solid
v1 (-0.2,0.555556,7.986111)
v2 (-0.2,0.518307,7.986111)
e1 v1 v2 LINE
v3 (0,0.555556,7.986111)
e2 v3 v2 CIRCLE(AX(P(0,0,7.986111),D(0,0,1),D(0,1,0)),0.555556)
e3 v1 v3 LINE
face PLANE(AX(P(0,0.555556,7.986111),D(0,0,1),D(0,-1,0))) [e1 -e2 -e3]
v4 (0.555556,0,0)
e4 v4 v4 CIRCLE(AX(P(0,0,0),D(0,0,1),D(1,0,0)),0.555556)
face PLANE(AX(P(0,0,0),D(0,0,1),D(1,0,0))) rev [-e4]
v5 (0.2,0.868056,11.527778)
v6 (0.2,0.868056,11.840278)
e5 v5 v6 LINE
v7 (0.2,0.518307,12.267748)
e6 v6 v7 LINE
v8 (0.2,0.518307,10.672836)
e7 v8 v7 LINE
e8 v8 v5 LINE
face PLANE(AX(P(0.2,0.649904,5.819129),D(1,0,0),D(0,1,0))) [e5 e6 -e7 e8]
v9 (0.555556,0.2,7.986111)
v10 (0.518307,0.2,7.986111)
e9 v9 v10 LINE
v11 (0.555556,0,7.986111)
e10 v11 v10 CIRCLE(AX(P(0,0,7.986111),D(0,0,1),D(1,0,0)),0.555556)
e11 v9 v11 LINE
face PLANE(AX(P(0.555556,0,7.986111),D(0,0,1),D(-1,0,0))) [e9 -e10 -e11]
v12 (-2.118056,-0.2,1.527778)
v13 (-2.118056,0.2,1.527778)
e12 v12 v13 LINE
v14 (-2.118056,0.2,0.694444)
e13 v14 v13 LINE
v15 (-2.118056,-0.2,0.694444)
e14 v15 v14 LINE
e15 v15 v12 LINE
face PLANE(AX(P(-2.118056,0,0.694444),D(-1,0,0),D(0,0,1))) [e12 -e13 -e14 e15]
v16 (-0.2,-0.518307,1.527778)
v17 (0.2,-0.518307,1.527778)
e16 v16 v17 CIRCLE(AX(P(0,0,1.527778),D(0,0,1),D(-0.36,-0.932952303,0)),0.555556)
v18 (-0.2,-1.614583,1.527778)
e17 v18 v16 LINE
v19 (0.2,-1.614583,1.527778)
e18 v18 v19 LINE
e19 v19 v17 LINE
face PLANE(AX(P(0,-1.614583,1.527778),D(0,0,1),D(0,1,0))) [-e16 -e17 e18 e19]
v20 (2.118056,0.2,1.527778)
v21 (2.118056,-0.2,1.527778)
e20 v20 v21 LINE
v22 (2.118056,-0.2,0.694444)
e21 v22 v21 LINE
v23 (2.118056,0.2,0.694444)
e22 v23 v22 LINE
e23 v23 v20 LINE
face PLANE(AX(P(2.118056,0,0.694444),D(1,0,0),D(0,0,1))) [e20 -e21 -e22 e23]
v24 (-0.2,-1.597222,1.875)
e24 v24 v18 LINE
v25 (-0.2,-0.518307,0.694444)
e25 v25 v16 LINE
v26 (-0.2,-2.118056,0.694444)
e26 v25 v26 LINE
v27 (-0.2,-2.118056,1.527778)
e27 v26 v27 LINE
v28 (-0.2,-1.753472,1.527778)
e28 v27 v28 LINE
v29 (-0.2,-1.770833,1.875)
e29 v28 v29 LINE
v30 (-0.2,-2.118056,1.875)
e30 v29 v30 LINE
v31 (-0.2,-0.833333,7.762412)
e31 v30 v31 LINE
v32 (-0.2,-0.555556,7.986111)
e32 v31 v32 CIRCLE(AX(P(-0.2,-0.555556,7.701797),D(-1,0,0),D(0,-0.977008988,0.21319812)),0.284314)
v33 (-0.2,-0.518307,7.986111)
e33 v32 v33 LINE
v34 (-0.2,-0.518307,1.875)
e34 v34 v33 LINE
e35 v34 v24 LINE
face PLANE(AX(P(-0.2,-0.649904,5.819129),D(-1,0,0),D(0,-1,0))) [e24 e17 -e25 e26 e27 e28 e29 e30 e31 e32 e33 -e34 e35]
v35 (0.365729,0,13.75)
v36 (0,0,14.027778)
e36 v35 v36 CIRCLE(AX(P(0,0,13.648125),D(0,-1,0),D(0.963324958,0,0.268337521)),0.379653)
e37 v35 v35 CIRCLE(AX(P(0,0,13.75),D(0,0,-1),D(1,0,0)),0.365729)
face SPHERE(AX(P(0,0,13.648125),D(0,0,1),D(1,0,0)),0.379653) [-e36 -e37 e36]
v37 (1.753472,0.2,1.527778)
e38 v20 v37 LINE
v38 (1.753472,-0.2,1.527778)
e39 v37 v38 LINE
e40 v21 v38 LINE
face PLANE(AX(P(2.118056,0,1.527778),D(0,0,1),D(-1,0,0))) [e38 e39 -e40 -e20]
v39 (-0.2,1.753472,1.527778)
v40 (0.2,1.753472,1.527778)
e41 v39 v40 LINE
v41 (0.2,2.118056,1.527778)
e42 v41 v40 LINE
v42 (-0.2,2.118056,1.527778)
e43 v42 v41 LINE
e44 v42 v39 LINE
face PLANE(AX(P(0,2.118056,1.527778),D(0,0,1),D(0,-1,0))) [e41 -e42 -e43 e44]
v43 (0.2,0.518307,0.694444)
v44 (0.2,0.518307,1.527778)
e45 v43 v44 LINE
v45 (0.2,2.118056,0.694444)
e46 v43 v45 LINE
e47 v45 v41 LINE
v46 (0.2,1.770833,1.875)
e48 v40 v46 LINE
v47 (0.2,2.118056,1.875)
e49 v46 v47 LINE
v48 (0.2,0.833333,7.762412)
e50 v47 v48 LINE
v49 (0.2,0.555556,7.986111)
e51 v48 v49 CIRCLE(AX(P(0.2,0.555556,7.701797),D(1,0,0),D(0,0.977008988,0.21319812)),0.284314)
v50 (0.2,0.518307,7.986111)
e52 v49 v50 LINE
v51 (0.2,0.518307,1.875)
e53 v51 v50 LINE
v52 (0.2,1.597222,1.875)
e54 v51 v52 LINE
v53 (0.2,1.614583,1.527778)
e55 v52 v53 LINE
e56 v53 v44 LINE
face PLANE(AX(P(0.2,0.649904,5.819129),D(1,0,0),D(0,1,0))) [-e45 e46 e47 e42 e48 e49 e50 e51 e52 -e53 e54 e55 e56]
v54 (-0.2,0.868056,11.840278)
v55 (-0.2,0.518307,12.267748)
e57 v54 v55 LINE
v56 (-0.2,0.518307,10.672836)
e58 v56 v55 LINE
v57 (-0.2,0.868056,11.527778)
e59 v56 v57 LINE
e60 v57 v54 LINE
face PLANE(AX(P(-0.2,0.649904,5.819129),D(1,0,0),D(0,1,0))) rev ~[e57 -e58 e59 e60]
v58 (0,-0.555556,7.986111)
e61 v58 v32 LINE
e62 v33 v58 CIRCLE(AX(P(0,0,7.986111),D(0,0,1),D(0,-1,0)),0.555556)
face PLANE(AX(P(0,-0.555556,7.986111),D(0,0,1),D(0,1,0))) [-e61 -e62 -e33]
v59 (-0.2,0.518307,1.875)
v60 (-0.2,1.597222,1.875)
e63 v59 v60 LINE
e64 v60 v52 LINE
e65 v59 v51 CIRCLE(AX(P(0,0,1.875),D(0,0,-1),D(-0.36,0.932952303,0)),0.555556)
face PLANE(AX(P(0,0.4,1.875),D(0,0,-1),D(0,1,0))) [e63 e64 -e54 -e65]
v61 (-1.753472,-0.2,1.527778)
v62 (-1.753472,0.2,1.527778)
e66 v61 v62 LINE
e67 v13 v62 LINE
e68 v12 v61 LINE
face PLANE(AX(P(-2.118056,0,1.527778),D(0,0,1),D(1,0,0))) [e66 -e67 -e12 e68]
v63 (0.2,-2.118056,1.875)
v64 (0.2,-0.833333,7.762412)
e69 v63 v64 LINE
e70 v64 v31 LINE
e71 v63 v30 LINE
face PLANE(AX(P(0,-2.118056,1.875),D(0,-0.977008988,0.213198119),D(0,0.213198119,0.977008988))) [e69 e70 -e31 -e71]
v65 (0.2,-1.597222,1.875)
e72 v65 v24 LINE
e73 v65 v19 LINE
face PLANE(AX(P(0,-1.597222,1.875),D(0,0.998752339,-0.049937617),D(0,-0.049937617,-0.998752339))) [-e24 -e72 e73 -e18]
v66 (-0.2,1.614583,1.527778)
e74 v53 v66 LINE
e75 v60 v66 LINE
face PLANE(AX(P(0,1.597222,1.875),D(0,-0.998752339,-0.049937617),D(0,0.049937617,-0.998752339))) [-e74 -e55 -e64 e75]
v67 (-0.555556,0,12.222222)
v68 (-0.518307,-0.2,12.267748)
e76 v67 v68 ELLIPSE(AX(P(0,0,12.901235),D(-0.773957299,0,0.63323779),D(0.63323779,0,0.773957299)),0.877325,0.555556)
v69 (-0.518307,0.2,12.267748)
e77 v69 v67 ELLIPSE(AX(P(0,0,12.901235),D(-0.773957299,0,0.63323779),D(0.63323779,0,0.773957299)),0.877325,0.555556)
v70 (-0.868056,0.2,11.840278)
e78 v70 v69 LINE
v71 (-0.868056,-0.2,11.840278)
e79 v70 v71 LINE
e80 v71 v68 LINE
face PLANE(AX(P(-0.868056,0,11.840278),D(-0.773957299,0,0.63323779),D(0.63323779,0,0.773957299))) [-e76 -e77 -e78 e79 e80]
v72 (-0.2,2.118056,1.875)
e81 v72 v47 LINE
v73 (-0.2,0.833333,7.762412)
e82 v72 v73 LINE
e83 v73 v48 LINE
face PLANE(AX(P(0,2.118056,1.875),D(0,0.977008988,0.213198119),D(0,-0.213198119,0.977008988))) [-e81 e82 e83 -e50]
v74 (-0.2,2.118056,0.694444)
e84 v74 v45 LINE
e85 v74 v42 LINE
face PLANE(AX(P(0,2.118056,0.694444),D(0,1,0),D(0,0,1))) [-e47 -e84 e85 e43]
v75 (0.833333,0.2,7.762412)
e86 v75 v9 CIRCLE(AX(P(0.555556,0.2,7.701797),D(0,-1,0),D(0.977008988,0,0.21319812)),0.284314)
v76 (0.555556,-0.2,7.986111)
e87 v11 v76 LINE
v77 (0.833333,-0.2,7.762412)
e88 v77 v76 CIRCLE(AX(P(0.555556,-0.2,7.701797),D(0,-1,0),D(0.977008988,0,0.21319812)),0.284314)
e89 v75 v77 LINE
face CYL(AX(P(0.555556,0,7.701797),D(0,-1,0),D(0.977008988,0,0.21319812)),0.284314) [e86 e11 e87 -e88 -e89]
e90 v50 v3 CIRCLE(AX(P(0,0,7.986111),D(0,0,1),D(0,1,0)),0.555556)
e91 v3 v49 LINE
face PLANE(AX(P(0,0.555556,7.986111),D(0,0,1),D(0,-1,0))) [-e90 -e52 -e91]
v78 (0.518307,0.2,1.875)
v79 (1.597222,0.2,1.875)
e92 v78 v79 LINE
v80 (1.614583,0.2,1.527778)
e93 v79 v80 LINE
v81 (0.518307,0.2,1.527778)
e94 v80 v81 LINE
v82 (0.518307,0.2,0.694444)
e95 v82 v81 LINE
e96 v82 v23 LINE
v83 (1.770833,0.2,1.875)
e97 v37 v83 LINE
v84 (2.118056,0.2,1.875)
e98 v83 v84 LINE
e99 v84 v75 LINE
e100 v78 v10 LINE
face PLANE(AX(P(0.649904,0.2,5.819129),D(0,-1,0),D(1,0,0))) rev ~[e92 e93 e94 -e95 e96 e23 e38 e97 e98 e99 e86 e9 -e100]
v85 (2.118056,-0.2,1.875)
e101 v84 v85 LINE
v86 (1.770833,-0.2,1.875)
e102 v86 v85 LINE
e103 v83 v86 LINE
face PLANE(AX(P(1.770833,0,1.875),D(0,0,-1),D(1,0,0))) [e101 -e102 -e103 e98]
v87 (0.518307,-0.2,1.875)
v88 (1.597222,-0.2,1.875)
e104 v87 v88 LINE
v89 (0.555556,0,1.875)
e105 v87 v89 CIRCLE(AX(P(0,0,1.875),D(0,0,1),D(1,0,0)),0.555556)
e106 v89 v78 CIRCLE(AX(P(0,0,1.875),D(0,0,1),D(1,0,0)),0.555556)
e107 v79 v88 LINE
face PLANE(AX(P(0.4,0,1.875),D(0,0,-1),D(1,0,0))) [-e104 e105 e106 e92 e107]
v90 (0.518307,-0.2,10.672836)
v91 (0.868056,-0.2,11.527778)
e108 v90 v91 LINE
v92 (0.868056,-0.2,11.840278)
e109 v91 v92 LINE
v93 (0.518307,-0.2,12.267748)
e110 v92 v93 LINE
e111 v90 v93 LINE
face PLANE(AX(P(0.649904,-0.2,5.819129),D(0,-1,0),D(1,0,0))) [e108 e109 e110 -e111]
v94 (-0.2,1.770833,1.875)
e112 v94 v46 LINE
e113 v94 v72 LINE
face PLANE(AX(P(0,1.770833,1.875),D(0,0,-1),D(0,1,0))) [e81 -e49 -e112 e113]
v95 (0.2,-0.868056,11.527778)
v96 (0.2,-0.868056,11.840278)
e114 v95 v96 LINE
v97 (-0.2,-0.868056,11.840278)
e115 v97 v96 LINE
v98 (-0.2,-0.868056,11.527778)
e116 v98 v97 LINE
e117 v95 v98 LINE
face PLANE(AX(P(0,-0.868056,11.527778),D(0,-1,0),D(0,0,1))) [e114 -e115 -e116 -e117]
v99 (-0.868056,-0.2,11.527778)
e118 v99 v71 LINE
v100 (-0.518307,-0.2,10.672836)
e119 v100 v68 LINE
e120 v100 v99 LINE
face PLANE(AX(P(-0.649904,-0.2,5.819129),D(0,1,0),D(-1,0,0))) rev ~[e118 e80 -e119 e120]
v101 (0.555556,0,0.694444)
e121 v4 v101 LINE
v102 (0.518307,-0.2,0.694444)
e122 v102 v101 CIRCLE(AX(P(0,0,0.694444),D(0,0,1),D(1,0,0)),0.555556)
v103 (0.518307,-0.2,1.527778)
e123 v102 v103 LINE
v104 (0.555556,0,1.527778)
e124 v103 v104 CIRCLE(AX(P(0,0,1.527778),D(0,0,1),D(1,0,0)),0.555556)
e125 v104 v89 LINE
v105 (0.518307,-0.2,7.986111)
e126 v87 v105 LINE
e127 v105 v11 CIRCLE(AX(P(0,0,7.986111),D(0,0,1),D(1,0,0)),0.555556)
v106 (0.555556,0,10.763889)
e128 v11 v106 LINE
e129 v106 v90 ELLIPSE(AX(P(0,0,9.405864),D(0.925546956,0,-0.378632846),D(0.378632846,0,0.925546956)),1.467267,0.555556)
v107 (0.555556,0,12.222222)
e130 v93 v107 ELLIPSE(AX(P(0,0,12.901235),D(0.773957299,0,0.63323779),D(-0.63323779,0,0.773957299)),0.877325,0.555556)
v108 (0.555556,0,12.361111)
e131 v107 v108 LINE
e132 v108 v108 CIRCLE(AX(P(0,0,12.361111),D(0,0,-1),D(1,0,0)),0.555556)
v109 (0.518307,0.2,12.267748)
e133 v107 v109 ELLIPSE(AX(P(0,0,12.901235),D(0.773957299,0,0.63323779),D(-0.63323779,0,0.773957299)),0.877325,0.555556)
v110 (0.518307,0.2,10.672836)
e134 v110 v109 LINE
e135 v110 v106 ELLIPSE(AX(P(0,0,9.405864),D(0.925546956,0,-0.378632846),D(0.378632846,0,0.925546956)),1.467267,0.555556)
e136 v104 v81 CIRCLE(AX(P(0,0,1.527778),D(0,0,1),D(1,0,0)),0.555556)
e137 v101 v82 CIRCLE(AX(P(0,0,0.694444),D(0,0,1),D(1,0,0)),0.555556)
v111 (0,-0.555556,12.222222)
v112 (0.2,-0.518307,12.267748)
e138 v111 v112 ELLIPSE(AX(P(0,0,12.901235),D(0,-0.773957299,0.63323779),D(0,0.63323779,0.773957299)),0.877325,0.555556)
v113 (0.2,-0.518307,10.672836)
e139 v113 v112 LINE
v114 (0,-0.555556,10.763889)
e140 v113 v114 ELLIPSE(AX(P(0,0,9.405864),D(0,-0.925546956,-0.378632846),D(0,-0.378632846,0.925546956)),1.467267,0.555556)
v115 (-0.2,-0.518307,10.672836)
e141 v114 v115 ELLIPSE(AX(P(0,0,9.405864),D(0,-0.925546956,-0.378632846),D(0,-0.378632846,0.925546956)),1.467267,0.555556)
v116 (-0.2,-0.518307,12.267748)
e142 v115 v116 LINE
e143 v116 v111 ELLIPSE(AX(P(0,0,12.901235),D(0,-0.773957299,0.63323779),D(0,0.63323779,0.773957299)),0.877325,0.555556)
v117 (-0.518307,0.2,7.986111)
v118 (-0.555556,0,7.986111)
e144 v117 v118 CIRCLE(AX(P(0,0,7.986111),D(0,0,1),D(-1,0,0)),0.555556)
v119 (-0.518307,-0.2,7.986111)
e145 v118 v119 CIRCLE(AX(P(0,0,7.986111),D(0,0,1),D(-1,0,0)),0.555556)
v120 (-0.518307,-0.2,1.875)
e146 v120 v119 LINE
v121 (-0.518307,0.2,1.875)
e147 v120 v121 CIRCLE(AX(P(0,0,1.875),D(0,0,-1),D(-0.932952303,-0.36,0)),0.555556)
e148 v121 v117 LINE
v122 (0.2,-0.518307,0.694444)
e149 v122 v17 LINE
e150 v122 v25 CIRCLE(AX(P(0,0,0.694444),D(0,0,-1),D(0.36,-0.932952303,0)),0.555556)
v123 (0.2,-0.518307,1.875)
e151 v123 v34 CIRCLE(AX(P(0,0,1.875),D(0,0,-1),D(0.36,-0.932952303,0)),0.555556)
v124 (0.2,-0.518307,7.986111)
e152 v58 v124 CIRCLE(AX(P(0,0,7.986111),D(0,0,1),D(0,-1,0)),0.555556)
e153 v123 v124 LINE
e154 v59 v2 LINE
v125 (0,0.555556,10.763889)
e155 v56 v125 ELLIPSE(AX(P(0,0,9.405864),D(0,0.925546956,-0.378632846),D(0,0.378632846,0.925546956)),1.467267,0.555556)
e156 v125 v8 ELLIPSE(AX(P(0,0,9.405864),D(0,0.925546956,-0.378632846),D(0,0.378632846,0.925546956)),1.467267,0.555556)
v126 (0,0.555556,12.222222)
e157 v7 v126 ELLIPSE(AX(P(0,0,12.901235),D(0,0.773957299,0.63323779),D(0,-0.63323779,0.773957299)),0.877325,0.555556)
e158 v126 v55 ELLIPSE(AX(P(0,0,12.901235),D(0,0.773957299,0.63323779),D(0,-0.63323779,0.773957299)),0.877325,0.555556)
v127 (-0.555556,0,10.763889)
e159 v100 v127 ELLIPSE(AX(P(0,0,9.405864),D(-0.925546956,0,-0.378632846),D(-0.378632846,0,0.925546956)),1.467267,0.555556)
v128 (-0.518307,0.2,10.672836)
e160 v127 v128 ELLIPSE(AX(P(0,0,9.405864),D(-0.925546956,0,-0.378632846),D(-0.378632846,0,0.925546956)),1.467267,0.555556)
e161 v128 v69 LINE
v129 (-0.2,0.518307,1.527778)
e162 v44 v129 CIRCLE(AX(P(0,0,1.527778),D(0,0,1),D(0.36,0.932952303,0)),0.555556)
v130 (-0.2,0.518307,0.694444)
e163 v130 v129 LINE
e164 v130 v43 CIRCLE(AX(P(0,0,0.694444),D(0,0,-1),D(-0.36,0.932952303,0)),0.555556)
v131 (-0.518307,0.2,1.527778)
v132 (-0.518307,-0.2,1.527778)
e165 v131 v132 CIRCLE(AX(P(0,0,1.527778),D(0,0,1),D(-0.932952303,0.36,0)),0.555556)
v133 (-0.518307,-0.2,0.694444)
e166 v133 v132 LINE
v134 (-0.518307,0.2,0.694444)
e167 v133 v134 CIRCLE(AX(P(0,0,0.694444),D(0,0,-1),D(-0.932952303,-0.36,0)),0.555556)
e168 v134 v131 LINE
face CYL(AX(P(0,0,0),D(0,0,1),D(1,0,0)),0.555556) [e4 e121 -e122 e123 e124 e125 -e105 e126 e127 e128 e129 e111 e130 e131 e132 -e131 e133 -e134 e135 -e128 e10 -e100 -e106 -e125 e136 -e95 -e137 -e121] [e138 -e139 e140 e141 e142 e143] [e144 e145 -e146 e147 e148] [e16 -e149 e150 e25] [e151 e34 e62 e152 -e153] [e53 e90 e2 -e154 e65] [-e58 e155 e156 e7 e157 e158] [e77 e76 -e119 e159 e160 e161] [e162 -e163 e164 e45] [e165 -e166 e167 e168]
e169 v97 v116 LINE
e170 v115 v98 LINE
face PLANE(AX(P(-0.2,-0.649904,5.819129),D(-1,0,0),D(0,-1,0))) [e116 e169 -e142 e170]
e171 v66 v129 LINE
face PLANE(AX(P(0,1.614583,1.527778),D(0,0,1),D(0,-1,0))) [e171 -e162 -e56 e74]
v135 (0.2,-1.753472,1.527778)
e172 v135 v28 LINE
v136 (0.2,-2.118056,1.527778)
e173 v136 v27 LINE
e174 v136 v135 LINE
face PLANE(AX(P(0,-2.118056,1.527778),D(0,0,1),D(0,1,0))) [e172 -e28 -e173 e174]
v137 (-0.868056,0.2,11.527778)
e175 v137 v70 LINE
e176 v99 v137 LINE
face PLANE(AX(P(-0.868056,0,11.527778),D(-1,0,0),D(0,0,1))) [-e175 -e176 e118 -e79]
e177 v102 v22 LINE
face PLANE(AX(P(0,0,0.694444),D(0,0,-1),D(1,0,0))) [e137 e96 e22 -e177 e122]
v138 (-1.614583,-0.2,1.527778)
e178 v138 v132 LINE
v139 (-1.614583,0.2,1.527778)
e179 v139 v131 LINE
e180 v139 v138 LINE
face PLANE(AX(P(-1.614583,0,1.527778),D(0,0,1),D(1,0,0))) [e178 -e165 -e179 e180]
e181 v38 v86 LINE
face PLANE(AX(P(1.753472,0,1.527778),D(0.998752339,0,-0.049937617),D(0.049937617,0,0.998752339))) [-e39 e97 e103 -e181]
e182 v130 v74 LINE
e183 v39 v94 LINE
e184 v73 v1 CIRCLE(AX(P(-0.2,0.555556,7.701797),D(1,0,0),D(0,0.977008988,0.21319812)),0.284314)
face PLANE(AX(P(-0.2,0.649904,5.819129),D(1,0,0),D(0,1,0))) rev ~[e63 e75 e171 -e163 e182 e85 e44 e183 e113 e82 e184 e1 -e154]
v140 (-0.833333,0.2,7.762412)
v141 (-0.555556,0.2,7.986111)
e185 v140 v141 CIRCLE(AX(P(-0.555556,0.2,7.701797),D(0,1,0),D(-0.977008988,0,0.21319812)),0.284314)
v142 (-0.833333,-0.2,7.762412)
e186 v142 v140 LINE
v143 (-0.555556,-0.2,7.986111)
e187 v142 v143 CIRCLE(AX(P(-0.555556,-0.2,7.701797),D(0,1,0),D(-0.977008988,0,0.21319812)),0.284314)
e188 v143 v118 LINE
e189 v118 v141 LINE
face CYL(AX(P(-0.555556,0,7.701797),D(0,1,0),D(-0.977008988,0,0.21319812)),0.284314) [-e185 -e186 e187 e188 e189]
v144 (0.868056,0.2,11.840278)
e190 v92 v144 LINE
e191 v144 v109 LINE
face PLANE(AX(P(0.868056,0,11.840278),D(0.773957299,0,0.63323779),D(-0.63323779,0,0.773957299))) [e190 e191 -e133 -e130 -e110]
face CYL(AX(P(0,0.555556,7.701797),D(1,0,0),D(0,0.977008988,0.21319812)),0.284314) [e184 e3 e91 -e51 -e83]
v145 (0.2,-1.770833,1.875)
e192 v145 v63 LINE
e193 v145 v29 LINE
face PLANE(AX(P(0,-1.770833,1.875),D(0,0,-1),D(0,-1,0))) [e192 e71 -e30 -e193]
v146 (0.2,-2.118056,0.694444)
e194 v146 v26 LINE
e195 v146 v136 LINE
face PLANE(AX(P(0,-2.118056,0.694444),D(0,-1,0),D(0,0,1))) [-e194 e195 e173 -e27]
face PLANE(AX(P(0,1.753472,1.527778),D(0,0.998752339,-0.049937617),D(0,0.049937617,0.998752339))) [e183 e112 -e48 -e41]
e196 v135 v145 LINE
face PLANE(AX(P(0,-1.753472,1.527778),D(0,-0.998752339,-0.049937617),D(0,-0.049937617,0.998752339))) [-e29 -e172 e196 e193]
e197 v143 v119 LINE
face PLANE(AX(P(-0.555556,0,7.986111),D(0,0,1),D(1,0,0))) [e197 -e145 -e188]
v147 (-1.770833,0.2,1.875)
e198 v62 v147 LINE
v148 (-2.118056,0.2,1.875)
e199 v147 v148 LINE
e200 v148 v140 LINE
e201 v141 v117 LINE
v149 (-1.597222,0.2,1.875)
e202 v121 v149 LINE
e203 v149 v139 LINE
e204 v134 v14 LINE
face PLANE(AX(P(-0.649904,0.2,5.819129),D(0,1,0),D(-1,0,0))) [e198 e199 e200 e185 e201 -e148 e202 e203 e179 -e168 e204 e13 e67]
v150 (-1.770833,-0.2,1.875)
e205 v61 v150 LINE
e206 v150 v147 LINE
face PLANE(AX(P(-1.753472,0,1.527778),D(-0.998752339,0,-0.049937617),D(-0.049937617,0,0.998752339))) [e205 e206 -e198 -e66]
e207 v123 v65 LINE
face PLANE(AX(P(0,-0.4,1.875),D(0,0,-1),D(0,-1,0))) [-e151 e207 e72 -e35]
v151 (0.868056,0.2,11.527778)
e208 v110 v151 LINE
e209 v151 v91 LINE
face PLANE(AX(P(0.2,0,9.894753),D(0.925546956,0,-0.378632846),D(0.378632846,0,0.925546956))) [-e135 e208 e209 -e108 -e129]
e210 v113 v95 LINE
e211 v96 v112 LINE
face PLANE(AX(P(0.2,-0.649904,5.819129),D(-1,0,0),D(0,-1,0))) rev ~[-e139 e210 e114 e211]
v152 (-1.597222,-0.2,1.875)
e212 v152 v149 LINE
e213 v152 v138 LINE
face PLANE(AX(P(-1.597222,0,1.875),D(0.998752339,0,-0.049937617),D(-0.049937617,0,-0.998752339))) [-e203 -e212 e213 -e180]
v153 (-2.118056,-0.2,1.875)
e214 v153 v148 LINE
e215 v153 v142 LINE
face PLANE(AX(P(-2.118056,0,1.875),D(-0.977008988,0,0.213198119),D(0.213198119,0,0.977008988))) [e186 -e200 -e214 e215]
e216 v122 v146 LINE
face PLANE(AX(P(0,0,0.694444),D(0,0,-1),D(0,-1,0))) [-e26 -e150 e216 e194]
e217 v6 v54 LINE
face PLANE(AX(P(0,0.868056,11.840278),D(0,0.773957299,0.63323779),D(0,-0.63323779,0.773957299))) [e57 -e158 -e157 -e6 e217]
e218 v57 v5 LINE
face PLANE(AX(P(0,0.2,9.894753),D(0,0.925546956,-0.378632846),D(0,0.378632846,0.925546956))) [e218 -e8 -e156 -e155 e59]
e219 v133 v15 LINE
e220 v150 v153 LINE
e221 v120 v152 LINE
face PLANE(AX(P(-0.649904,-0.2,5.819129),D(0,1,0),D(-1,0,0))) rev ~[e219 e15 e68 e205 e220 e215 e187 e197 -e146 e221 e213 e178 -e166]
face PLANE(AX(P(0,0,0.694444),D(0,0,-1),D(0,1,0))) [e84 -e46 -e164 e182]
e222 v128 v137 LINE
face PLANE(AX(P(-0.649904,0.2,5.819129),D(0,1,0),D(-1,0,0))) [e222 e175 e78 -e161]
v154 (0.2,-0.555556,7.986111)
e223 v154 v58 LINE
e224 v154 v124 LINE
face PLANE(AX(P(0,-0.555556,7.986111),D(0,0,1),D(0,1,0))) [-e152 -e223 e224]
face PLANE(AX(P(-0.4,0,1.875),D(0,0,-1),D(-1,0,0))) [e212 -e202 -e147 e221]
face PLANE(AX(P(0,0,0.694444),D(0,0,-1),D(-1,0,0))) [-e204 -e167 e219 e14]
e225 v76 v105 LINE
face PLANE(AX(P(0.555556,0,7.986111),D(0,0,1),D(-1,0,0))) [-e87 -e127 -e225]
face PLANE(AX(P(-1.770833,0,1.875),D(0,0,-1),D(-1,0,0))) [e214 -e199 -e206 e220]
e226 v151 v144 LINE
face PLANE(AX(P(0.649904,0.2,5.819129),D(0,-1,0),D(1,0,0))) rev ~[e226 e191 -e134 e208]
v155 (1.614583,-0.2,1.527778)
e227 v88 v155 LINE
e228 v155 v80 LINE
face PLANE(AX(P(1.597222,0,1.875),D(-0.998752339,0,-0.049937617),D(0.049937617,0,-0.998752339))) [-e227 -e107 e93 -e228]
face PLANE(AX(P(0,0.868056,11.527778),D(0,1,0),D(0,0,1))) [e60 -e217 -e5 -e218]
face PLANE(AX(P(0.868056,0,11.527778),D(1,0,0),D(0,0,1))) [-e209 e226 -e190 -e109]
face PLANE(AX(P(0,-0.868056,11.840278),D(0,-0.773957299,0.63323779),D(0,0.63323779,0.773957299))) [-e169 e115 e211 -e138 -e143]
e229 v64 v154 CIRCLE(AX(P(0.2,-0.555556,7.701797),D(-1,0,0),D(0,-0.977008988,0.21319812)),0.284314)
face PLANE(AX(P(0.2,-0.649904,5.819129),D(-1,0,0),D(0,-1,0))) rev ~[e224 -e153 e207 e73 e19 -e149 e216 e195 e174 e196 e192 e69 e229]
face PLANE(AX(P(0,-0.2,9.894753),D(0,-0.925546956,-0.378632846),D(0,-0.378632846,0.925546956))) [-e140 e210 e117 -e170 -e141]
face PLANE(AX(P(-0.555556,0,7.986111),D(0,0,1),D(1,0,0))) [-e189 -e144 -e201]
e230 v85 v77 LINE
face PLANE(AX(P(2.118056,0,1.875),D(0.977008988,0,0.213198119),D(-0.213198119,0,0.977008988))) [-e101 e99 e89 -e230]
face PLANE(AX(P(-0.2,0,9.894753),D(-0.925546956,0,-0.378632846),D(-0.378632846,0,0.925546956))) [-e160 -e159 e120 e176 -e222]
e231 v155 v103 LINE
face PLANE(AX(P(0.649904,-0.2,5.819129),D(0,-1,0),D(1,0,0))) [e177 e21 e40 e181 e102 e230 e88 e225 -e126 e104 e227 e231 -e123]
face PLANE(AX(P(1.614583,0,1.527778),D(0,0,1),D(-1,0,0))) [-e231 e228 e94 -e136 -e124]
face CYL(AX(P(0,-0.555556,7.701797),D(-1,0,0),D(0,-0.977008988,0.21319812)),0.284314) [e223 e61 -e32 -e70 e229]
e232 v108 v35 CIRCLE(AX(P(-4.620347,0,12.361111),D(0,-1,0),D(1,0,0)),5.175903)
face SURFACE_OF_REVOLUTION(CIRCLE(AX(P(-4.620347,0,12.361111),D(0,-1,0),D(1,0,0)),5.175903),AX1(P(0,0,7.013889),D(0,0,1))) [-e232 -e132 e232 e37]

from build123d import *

# Parameters (mm, degrees)
F3_DEPTH = 0.2
F4_COUNT = 4


# Not quite as in the source:
# - a feature names something its author has since deleted; it is built from what else it names


with BuildPart() as f1:
    # F0 (on Front) → F1 (revolve)
    with BuildSketch(Plane.XZ):
        with BuildLine():
            Line((0, 14.0277777778), (0, 0))
            Line((0, 0), (0.5555555556, 0))
            Line((0.5555555556, 0), (0.5555555556, 12.3611111111))
            ThreePointArc((0.5555555556, 12.3611111111), (0.5078793667, 13.0620116793), (0.3657291084, 13.75))
            ThreePointArc((0.3657291084, 13.75), (0.2296291982, 13.9504603784), (0, 14.0277777778))
        make_face()
    revolve(axis=Axis((0, 0, 7.0138888889), (0, 0, 1)))

    # F2 (on Front) → F3 (join, symmetric)
    with BuildSketch(Plane.XZ):
        with BuildLine():
            Line((0, 12.6567901235), (0, 0.6944444444))
            Line((0, 0.6944444444), (2.1180555556, 0.6944444444))
            Line((2.1180555556, 0.6944444444), (2.1180555556, 1.5277777778))
            Line((2.1180555556, 1.5277777778), (1.7534722222, 1.5277777778))
            Line((1.7534722222, 1.5277777778), (1.6145833333, 1.5277777778))
            Line((1.6145833333, 1.5277777778), (0.4, 1.5277777778))
            Line((0.4, 1.5277777778), (0.4, 1.875))
            Line((0.4, 1.875), (1.5972222222, 1.875))
            Line((1.5972222222, 1.875), (1.7708333333, 1.875))
            Line((1.7708333333, 1.875), (2.1180555556, 1.875))
            Line((2.1180555556, 1.875), (0.8333333333, 7.7624119633))
            ThreePointArc((0.8333333333, 7.7624119633), (0.7338823641, 7.9232334612), (0.5555555556, 7.9861111111))
            Line((0.5555555556, 7.9861111111), (0.2, 7.9861111111))
            Line((0.2, 7.9861111111), (0.2, 9.8947530864))
            Line((0.2, 9.8947530864), (0.8680555556, 11.5277777778))
            Line((0.8680555556, 11.5277777778), (0.8680555556, 11.8402777778))
            Line((0.8680555556, 11.8402777778), (0.2, 12.6567901235))
            Line((0.2, 12.6567901235), (0, 12.6567901235))
        make_face()
        Polygon((1.6145833333, 1.5277777778), (1.7534722222, 1.5277777778), (1.7708333333, 1.875), (1.5972222222, 1.875), align=None)
    extrude(amount=F3_DEPTH, both=True)

    # F4: F1 ×4 about axis
    f4_axis = Axis((0, 0, 0), (0, 0, 1))


with BuildPart() as f1_1:
    add(f1.part)
    for i in range(1, F4_COUNT):
        add(f1.part.rotate(f4_axis, i * 360 / F4_COUNT))


solid = f1_1.part
